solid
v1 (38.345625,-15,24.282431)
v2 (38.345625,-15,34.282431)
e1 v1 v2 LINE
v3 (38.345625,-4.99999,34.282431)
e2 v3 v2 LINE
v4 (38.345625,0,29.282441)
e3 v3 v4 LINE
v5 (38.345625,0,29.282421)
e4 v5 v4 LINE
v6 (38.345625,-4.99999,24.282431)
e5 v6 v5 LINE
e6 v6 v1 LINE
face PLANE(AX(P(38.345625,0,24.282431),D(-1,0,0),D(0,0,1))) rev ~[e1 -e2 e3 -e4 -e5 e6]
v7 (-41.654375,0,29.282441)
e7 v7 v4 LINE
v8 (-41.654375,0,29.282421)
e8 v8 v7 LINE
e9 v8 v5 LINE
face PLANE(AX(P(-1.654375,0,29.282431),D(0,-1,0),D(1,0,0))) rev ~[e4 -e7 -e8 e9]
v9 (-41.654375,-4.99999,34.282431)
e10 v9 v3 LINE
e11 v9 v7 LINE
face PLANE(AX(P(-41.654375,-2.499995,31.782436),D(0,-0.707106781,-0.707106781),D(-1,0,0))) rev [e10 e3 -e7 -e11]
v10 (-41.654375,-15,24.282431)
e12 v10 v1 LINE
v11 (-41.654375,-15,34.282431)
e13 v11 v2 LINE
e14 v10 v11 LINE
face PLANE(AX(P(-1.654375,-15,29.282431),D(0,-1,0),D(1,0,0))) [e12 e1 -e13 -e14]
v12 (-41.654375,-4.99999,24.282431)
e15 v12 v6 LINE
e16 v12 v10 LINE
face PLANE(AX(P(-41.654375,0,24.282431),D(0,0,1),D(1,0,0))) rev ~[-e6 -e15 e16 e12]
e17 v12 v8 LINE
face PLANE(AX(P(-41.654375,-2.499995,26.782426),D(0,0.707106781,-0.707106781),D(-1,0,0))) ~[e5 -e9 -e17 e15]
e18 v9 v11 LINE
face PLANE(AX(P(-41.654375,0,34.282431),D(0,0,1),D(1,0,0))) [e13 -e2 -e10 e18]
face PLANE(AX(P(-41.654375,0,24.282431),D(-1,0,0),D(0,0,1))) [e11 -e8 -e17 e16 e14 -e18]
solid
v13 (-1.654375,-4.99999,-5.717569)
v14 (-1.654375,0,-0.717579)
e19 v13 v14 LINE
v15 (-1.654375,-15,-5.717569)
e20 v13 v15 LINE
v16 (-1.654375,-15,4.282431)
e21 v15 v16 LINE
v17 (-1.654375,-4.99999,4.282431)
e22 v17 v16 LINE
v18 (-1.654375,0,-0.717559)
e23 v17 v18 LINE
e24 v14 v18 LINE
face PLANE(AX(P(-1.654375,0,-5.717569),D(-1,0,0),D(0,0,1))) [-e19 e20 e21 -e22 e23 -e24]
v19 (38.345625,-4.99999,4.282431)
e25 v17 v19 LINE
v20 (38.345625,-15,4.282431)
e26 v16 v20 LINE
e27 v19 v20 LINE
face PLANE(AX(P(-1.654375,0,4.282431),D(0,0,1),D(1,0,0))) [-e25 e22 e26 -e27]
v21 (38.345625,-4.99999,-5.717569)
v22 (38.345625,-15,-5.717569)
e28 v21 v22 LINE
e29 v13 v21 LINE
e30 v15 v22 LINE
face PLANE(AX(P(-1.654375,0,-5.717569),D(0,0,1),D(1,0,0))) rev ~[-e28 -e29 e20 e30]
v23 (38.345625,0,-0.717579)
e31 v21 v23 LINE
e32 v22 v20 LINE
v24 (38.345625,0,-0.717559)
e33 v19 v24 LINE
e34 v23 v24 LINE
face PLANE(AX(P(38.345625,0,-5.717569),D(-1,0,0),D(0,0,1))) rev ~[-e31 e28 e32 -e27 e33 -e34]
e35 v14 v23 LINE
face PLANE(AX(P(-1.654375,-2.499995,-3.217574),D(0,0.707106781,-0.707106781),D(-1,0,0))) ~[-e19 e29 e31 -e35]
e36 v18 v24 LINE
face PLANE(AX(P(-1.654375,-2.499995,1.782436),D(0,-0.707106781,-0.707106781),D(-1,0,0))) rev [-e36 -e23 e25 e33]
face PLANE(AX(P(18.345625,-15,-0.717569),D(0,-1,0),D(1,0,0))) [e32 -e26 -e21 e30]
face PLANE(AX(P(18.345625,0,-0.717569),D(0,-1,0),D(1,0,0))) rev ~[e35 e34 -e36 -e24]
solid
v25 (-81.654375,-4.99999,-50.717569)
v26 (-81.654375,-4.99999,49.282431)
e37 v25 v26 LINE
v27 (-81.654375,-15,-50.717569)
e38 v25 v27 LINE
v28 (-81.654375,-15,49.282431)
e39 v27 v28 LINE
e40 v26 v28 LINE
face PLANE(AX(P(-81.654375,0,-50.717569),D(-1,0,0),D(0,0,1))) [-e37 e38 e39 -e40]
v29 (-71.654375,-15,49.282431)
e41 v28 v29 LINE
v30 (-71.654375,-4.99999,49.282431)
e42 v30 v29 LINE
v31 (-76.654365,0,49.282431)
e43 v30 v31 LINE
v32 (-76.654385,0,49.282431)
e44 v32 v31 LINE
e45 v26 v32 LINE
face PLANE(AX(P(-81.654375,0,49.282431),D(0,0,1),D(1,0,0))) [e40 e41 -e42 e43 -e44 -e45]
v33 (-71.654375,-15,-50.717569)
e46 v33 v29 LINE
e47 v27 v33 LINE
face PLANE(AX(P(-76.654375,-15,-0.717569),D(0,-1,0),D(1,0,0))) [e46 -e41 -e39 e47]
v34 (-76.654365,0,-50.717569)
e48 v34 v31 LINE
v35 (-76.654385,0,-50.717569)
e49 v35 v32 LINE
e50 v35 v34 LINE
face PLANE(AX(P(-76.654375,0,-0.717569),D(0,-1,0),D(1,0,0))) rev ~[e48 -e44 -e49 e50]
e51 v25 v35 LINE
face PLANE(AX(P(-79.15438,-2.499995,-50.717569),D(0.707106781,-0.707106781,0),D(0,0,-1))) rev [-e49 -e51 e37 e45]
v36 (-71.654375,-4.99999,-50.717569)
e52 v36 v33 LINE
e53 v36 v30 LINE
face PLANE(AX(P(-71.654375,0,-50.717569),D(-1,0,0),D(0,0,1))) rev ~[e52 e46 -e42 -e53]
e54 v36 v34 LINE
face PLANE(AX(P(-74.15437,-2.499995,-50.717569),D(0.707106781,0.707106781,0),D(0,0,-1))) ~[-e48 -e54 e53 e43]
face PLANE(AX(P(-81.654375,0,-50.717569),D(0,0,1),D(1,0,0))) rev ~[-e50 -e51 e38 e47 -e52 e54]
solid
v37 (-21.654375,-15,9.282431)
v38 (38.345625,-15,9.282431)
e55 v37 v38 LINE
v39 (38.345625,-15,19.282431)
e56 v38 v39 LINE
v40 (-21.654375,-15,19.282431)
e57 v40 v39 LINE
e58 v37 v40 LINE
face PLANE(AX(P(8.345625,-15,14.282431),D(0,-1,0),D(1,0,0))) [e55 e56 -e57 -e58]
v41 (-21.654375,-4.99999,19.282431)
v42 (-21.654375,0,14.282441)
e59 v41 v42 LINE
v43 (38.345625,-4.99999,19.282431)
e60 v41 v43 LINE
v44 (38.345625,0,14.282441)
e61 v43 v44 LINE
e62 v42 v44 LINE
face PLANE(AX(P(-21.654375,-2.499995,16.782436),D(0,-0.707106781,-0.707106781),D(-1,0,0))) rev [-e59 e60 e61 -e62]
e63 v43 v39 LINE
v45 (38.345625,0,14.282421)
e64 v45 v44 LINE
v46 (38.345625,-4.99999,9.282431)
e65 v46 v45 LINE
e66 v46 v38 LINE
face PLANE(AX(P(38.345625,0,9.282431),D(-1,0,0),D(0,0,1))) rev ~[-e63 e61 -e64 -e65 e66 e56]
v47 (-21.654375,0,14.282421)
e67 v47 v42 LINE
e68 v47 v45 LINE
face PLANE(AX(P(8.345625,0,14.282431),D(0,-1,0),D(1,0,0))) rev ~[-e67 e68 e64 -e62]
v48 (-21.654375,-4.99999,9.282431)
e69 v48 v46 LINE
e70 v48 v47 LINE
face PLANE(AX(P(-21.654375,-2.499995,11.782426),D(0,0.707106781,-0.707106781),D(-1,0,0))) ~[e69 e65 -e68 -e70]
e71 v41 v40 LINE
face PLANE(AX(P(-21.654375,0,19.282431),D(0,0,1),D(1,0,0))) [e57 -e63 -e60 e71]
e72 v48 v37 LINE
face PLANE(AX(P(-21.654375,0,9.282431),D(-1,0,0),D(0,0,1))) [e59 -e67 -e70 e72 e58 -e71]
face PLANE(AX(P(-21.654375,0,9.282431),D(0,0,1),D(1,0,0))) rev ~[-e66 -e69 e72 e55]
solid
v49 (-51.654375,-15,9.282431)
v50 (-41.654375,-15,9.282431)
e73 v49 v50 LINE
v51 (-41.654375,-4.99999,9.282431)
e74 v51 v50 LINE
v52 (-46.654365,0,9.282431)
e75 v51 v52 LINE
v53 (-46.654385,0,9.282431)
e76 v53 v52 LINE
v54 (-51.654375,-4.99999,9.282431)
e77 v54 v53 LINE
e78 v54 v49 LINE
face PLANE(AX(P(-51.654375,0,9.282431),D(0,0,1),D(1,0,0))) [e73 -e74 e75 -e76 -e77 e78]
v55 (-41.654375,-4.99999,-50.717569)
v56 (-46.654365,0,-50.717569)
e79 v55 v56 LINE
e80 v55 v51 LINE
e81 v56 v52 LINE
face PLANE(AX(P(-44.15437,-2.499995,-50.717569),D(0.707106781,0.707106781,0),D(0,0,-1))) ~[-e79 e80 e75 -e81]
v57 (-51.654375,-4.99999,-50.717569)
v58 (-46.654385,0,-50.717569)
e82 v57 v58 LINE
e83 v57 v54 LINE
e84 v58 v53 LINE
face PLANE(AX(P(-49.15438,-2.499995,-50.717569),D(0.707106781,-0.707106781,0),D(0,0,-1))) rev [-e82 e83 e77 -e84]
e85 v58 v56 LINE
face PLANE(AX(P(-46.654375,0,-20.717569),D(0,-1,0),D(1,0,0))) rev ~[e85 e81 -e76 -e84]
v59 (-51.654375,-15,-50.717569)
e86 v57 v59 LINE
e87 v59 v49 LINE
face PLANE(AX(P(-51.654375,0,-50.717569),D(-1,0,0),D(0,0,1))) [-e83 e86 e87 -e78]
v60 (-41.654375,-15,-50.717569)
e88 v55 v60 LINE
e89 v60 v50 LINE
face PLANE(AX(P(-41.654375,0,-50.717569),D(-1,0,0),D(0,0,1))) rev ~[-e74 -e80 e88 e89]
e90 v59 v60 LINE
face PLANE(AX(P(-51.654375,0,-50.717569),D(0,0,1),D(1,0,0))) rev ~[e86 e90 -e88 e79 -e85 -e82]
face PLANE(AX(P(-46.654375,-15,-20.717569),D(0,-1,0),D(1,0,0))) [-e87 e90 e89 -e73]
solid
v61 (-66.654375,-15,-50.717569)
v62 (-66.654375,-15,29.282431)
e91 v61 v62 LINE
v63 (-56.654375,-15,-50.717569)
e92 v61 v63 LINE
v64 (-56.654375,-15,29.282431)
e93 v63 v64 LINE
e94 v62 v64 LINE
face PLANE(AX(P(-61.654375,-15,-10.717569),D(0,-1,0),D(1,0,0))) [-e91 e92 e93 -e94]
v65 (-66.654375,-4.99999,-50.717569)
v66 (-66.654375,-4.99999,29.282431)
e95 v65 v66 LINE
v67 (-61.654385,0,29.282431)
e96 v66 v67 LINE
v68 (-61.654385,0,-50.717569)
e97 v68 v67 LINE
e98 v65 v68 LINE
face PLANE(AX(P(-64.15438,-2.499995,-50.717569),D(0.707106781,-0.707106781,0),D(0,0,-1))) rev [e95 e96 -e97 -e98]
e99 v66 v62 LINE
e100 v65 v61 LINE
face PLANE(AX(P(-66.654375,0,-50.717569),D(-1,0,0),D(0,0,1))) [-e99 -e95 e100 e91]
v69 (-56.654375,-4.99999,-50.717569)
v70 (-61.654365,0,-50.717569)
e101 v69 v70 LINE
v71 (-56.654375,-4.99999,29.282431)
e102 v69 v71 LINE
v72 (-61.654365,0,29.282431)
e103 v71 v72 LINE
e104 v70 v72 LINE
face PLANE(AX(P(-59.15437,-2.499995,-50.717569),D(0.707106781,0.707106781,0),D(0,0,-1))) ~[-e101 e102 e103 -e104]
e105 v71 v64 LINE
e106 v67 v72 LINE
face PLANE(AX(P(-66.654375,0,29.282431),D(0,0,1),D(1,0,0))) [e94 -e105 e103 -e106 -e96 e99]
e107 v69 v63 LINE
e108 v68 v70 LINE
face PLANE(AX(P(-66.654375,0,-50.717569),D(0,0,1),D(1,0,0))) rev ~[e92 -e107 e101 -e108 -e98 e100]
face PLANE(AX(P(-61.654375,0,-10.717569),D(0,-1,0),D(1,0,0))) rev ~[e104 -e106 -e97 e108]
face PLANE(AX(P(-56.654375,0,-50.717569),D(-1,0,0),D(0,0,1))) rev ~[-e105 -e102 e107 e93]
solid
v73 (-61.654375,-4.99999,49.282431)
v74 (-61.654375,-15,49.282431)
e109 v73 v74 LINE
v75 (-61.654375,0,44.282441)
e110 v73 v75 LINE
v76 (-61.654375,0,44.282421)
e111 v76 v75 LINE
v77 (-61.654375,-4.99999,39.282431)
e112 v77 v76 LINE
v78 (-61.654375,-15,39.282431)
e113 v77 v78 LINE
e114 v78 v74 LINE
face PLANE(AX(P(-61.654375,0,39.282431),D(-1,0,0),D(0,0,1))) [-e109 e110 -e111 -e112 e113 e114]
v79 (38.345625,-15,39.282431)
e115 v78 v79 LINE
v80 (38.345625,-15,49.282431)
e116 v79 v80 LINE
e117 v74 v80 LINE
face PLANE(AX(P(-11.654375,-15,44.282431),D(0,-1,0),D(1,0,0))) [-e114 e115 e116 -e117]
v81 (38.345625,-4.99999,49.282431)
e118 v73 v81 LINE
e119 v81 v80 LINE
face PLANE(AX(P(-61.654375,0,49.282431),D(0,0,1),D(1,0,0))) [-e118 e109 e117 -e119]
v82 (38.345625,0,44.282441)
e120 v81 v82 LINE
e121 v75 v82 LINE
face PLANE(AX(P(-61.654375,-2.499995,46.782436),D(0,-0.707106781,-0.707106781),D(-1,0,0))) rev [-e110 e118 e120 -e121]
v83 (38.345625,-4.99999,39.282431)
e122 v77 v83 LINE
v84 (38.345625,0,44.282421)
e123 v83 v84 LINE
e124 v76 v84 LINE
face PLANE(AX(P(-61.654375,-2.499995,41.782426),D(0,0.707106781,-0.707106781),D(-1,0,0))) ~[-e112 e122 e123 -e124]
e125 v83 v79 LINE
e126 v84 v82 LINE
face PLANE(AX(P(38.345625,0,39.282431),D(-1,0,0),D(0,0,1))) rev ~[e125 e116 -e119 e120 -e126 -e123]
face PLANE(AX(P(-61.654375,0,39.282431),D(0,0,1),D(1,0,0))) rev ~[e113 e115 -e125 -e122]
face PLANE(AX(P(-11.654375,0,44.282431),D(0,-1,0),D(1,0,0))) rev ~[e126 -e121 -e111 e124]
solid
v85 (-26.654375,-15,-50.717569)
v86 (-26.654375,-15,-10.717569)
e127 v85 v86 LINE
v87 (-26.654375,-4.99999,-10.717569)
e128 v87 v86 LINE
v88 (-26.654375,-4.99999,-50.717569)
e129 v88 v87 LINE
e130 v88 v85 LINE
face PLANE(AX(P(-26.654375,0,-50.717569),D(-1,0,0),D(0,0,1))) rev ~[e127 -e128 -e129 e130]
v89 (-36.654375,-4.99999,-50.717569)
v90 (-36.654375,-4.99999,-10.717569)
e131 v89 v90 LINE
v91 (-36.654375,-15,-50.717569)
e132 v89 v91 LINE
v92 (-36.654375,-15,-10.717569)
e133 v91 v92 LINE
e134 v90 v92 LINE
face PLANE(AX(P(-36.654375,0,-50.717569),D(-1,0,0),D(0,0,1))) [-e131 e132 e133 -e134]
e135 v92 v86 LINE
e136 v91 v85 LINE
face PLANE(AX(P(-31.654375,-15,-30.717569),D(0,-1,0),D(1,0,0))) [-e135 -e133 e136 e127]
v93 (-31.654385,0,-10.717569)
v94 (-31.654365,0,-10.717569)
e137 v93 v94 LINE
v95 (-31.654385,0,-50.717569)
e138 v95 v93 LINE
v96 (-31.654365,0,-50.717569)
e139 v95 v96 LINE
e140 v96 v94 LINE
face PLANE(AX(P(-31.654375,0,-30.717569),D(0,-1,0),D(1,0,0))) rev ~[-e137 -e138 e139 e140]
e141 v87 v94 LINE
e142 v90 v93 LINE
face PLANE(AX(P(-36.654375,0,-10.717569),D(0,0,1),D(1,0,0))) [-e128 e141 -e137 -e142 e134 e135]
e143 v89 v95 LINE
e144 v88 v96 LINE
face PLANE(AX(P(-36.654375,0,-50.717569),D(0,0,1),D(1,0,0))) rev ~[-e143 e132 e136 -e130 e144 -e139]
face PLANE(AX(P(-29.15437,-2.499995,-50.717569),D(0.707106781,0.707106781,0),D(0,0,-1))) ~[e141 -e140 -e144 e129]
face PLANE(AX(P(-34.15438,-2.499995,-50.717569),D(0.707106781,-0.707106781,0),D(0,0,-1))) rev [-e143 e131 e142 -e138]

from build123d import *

# Parameters (mm, degrees)
F0_W      = 10
F0_H      = 100
F1_DEPTH  = 15
F0_H_2    = 80
F0_H_3    = 60
F0_H_4    = 40
F0_W_2    = 100
F0_H_5    = 10
F0_W_3    = 80
F0_W_4    = 60
F0_W_5    = 40
F2_SIZE   = 4.99999
F2_2_SIZE = 4.99999
F2_3_SIZE = 4.99999
F2_4_SIZE = 4.99999
F2_5_SIZE = 4.99999
F2_6_SIZE = 4.99999
F2_7_SIZE = 4.99999
F2_8_SIZE = 4.99999


# Not quite as in the source:
# - a fillet or chamfer is up to 0.001 mm smaller than in the source, because OpenCascade refuses the exact size


with BuildPart() as f1:
    # F0 (on Front) → F1 (new body)
    with BuildSketch(Plane.XZ):
        with Locations((-76.6543754238, -0.7175691426)):
            Rectangle(F0_W, F0_H)
    extrude(amount=F1_DEPTH)

    # F2#8 (size 5 in the source; OpenCascade refuses exactly that, so slightly less here)
    f2_8_edges = [f1.edges().sort_by_distance(p)[0] for p in [
        (-71.654375, 0, -0.717569),
        (-81.654375, 0, -0.717569),
    ]]
    chamfer(f2_8_edges, length=F2_8_SIZE)


with BuildPart() as f1b:
    # F0 (on Front) → F1, piece 2 (new body)
    with BuildSketch(Plane.XZ):
        with Locations((-61.6543754238, -10.7175691426)):
            Rectangle(F0_W, F0_H_2)
    extrude(amount=F1_DEPTH)

    # F2#7 (size 5 in the source; OpenCascade refuses exactly that, so slightly less here)
    f2_7_edges = [f1b.edges().sort_by_distance(p)[0] for p in [
        (-56.654375, 0, -10.717569),
        (-66.654375, 0, -10.717569),
    ]]
    chamfer(f2_7_edges, length=F2_7_SIZE)


with BuildPart() as f1c:
    # F0 (on Front) → F1, piece 3 (new body)
    with BuildSketch(Plane.XZ):
        with Locations((-46.6543754238, -20.7175691426)):
            Rectangle(F0_W, F0_H_3)
    extrude(amount=F1_DEPTH)

    # F2#6 (size 5 in the source; OpenCascade refuses exactly that, so slightly less here)
    f2_6_edges = [f1c.edges().sort_by_distance(p)[0] for p in [
        (-41.654375, 0, -20.717569),
        (-51.654375, 0, -20.717569),
    ]]
    chamfer(f2_6_edges, length=F2_6_SIZE)


with BuildPart() as f1d:
    # F0 (on Front) → F1, piece 4 (new body)
    with BuildSketch(Plane.XZ):
        with Locations((-31.6543754238, -30.7175691426)):
            Rectangle(F0_W, F0_H_4)
    extrude(amount=F1_DEPTH)

    # F2#5 (size 5 in the source; OpenCascade refuses exactly that, so slightly less here)
    f2_5_edges = [f1d.edges().sort_by_distance(p)[0] for p in [
        (-26.654375, 0, -30.717569),
        (-36.654375, 0, -30.717569),
    ]]
    chamfer(f2_5_edges, length=F2_5_SIZE)


with BuildPart() as f1e:
    # F0 (on Front) → F1, piece 5 (new body)
    with BuildSketch(Plane.XZ):
        with Locations((-11.6543754238, 44.2824308574)):
            Rectangle(F0_W_2, F0_H_5)
    extrude(amount=F1_DEPTH)

    # F2#4 (size 5 in the source; OpenCascade refuses exactly that, so slightly less here)
    f2_4_edges = [f1e.edges().sort_by_distance(p)[0] for p in [
        (-11.654375, 0, 39.282431),
        (-11.654375, 0, 49.282431),
    ]]
    chamfer(f2_4_edges, length=F2_4_SIZE)


with BuildPart() as f1f:
    # F0 (on Front) → F1, piece 6 (new body)
    with BuildSketch(Plane.XZ):
        with Locations((-1.6543754238, 29.2824308574)):
            Rectangle(F0_W_3, F0_H_5)
    extrude(amount=F1_DEPTH)

    # F2#3 (size 5 in the source; OpenCascade refuses exactly that, so slightly less here)
    f2_3_edges = [f1f.edges().sort_by_distance(p)[0] for p in [
        (-1.654375, 0, 24.282431),
        (-1.654375, 0, 34.282431),
    ]]
    chamfer(f2_3_edges, length=F2_3_SIZE)


with BuildPart() as f1g:
    # F0 (on Front) → F1, piece 7 (new body)
    with BuildSketch(Plane.XZ):
        with Locations((8.3456245762, 14.2824308574)):
            Rectangle(F0_W_4, F0_H_5)
    extrude(amount=F1_DEPTH)

    # F2#2 (size 5 in the source; OpenCascade refuses exactly that, so slightly less here)
    f2_2_edges = [f1g.edges().sort_by_distance(p)[0] for p in [
        (8.345625, 0, 9.282431),
        (8.345625, 0, 19.282431),
    ]]
    chamfer(f2_2_edges, length=F2_2_SIZE)


with BuildPart() as f1h:
    # F0 (on Front) → F1, piece 8 (new body)
    with BuildSketch(Plane.XZ):
        with Locations((18.3456245762, -0.7175691426)):
            Rectangle(F0_W_5, F0_H_5)
    extrude(amount=F1_DEPTH)

    # F2 (size 5 in the source; OpenCascade refuses exactly that, so slightly less here)
    f2_edges = [f1h.edges().sort_by_distance(p)[0] for p in [
        (18.345625, 0, -5.717569),
        (18.345625, 0, 4.282431),
    ]]
    chamfer(f2_edges, length=F2_SIZE)


solid = Compound([f1.part, f1b.part, f1c.part, f1d.part, f1e.part, f1f.part, f1g.part, f1h.part])
